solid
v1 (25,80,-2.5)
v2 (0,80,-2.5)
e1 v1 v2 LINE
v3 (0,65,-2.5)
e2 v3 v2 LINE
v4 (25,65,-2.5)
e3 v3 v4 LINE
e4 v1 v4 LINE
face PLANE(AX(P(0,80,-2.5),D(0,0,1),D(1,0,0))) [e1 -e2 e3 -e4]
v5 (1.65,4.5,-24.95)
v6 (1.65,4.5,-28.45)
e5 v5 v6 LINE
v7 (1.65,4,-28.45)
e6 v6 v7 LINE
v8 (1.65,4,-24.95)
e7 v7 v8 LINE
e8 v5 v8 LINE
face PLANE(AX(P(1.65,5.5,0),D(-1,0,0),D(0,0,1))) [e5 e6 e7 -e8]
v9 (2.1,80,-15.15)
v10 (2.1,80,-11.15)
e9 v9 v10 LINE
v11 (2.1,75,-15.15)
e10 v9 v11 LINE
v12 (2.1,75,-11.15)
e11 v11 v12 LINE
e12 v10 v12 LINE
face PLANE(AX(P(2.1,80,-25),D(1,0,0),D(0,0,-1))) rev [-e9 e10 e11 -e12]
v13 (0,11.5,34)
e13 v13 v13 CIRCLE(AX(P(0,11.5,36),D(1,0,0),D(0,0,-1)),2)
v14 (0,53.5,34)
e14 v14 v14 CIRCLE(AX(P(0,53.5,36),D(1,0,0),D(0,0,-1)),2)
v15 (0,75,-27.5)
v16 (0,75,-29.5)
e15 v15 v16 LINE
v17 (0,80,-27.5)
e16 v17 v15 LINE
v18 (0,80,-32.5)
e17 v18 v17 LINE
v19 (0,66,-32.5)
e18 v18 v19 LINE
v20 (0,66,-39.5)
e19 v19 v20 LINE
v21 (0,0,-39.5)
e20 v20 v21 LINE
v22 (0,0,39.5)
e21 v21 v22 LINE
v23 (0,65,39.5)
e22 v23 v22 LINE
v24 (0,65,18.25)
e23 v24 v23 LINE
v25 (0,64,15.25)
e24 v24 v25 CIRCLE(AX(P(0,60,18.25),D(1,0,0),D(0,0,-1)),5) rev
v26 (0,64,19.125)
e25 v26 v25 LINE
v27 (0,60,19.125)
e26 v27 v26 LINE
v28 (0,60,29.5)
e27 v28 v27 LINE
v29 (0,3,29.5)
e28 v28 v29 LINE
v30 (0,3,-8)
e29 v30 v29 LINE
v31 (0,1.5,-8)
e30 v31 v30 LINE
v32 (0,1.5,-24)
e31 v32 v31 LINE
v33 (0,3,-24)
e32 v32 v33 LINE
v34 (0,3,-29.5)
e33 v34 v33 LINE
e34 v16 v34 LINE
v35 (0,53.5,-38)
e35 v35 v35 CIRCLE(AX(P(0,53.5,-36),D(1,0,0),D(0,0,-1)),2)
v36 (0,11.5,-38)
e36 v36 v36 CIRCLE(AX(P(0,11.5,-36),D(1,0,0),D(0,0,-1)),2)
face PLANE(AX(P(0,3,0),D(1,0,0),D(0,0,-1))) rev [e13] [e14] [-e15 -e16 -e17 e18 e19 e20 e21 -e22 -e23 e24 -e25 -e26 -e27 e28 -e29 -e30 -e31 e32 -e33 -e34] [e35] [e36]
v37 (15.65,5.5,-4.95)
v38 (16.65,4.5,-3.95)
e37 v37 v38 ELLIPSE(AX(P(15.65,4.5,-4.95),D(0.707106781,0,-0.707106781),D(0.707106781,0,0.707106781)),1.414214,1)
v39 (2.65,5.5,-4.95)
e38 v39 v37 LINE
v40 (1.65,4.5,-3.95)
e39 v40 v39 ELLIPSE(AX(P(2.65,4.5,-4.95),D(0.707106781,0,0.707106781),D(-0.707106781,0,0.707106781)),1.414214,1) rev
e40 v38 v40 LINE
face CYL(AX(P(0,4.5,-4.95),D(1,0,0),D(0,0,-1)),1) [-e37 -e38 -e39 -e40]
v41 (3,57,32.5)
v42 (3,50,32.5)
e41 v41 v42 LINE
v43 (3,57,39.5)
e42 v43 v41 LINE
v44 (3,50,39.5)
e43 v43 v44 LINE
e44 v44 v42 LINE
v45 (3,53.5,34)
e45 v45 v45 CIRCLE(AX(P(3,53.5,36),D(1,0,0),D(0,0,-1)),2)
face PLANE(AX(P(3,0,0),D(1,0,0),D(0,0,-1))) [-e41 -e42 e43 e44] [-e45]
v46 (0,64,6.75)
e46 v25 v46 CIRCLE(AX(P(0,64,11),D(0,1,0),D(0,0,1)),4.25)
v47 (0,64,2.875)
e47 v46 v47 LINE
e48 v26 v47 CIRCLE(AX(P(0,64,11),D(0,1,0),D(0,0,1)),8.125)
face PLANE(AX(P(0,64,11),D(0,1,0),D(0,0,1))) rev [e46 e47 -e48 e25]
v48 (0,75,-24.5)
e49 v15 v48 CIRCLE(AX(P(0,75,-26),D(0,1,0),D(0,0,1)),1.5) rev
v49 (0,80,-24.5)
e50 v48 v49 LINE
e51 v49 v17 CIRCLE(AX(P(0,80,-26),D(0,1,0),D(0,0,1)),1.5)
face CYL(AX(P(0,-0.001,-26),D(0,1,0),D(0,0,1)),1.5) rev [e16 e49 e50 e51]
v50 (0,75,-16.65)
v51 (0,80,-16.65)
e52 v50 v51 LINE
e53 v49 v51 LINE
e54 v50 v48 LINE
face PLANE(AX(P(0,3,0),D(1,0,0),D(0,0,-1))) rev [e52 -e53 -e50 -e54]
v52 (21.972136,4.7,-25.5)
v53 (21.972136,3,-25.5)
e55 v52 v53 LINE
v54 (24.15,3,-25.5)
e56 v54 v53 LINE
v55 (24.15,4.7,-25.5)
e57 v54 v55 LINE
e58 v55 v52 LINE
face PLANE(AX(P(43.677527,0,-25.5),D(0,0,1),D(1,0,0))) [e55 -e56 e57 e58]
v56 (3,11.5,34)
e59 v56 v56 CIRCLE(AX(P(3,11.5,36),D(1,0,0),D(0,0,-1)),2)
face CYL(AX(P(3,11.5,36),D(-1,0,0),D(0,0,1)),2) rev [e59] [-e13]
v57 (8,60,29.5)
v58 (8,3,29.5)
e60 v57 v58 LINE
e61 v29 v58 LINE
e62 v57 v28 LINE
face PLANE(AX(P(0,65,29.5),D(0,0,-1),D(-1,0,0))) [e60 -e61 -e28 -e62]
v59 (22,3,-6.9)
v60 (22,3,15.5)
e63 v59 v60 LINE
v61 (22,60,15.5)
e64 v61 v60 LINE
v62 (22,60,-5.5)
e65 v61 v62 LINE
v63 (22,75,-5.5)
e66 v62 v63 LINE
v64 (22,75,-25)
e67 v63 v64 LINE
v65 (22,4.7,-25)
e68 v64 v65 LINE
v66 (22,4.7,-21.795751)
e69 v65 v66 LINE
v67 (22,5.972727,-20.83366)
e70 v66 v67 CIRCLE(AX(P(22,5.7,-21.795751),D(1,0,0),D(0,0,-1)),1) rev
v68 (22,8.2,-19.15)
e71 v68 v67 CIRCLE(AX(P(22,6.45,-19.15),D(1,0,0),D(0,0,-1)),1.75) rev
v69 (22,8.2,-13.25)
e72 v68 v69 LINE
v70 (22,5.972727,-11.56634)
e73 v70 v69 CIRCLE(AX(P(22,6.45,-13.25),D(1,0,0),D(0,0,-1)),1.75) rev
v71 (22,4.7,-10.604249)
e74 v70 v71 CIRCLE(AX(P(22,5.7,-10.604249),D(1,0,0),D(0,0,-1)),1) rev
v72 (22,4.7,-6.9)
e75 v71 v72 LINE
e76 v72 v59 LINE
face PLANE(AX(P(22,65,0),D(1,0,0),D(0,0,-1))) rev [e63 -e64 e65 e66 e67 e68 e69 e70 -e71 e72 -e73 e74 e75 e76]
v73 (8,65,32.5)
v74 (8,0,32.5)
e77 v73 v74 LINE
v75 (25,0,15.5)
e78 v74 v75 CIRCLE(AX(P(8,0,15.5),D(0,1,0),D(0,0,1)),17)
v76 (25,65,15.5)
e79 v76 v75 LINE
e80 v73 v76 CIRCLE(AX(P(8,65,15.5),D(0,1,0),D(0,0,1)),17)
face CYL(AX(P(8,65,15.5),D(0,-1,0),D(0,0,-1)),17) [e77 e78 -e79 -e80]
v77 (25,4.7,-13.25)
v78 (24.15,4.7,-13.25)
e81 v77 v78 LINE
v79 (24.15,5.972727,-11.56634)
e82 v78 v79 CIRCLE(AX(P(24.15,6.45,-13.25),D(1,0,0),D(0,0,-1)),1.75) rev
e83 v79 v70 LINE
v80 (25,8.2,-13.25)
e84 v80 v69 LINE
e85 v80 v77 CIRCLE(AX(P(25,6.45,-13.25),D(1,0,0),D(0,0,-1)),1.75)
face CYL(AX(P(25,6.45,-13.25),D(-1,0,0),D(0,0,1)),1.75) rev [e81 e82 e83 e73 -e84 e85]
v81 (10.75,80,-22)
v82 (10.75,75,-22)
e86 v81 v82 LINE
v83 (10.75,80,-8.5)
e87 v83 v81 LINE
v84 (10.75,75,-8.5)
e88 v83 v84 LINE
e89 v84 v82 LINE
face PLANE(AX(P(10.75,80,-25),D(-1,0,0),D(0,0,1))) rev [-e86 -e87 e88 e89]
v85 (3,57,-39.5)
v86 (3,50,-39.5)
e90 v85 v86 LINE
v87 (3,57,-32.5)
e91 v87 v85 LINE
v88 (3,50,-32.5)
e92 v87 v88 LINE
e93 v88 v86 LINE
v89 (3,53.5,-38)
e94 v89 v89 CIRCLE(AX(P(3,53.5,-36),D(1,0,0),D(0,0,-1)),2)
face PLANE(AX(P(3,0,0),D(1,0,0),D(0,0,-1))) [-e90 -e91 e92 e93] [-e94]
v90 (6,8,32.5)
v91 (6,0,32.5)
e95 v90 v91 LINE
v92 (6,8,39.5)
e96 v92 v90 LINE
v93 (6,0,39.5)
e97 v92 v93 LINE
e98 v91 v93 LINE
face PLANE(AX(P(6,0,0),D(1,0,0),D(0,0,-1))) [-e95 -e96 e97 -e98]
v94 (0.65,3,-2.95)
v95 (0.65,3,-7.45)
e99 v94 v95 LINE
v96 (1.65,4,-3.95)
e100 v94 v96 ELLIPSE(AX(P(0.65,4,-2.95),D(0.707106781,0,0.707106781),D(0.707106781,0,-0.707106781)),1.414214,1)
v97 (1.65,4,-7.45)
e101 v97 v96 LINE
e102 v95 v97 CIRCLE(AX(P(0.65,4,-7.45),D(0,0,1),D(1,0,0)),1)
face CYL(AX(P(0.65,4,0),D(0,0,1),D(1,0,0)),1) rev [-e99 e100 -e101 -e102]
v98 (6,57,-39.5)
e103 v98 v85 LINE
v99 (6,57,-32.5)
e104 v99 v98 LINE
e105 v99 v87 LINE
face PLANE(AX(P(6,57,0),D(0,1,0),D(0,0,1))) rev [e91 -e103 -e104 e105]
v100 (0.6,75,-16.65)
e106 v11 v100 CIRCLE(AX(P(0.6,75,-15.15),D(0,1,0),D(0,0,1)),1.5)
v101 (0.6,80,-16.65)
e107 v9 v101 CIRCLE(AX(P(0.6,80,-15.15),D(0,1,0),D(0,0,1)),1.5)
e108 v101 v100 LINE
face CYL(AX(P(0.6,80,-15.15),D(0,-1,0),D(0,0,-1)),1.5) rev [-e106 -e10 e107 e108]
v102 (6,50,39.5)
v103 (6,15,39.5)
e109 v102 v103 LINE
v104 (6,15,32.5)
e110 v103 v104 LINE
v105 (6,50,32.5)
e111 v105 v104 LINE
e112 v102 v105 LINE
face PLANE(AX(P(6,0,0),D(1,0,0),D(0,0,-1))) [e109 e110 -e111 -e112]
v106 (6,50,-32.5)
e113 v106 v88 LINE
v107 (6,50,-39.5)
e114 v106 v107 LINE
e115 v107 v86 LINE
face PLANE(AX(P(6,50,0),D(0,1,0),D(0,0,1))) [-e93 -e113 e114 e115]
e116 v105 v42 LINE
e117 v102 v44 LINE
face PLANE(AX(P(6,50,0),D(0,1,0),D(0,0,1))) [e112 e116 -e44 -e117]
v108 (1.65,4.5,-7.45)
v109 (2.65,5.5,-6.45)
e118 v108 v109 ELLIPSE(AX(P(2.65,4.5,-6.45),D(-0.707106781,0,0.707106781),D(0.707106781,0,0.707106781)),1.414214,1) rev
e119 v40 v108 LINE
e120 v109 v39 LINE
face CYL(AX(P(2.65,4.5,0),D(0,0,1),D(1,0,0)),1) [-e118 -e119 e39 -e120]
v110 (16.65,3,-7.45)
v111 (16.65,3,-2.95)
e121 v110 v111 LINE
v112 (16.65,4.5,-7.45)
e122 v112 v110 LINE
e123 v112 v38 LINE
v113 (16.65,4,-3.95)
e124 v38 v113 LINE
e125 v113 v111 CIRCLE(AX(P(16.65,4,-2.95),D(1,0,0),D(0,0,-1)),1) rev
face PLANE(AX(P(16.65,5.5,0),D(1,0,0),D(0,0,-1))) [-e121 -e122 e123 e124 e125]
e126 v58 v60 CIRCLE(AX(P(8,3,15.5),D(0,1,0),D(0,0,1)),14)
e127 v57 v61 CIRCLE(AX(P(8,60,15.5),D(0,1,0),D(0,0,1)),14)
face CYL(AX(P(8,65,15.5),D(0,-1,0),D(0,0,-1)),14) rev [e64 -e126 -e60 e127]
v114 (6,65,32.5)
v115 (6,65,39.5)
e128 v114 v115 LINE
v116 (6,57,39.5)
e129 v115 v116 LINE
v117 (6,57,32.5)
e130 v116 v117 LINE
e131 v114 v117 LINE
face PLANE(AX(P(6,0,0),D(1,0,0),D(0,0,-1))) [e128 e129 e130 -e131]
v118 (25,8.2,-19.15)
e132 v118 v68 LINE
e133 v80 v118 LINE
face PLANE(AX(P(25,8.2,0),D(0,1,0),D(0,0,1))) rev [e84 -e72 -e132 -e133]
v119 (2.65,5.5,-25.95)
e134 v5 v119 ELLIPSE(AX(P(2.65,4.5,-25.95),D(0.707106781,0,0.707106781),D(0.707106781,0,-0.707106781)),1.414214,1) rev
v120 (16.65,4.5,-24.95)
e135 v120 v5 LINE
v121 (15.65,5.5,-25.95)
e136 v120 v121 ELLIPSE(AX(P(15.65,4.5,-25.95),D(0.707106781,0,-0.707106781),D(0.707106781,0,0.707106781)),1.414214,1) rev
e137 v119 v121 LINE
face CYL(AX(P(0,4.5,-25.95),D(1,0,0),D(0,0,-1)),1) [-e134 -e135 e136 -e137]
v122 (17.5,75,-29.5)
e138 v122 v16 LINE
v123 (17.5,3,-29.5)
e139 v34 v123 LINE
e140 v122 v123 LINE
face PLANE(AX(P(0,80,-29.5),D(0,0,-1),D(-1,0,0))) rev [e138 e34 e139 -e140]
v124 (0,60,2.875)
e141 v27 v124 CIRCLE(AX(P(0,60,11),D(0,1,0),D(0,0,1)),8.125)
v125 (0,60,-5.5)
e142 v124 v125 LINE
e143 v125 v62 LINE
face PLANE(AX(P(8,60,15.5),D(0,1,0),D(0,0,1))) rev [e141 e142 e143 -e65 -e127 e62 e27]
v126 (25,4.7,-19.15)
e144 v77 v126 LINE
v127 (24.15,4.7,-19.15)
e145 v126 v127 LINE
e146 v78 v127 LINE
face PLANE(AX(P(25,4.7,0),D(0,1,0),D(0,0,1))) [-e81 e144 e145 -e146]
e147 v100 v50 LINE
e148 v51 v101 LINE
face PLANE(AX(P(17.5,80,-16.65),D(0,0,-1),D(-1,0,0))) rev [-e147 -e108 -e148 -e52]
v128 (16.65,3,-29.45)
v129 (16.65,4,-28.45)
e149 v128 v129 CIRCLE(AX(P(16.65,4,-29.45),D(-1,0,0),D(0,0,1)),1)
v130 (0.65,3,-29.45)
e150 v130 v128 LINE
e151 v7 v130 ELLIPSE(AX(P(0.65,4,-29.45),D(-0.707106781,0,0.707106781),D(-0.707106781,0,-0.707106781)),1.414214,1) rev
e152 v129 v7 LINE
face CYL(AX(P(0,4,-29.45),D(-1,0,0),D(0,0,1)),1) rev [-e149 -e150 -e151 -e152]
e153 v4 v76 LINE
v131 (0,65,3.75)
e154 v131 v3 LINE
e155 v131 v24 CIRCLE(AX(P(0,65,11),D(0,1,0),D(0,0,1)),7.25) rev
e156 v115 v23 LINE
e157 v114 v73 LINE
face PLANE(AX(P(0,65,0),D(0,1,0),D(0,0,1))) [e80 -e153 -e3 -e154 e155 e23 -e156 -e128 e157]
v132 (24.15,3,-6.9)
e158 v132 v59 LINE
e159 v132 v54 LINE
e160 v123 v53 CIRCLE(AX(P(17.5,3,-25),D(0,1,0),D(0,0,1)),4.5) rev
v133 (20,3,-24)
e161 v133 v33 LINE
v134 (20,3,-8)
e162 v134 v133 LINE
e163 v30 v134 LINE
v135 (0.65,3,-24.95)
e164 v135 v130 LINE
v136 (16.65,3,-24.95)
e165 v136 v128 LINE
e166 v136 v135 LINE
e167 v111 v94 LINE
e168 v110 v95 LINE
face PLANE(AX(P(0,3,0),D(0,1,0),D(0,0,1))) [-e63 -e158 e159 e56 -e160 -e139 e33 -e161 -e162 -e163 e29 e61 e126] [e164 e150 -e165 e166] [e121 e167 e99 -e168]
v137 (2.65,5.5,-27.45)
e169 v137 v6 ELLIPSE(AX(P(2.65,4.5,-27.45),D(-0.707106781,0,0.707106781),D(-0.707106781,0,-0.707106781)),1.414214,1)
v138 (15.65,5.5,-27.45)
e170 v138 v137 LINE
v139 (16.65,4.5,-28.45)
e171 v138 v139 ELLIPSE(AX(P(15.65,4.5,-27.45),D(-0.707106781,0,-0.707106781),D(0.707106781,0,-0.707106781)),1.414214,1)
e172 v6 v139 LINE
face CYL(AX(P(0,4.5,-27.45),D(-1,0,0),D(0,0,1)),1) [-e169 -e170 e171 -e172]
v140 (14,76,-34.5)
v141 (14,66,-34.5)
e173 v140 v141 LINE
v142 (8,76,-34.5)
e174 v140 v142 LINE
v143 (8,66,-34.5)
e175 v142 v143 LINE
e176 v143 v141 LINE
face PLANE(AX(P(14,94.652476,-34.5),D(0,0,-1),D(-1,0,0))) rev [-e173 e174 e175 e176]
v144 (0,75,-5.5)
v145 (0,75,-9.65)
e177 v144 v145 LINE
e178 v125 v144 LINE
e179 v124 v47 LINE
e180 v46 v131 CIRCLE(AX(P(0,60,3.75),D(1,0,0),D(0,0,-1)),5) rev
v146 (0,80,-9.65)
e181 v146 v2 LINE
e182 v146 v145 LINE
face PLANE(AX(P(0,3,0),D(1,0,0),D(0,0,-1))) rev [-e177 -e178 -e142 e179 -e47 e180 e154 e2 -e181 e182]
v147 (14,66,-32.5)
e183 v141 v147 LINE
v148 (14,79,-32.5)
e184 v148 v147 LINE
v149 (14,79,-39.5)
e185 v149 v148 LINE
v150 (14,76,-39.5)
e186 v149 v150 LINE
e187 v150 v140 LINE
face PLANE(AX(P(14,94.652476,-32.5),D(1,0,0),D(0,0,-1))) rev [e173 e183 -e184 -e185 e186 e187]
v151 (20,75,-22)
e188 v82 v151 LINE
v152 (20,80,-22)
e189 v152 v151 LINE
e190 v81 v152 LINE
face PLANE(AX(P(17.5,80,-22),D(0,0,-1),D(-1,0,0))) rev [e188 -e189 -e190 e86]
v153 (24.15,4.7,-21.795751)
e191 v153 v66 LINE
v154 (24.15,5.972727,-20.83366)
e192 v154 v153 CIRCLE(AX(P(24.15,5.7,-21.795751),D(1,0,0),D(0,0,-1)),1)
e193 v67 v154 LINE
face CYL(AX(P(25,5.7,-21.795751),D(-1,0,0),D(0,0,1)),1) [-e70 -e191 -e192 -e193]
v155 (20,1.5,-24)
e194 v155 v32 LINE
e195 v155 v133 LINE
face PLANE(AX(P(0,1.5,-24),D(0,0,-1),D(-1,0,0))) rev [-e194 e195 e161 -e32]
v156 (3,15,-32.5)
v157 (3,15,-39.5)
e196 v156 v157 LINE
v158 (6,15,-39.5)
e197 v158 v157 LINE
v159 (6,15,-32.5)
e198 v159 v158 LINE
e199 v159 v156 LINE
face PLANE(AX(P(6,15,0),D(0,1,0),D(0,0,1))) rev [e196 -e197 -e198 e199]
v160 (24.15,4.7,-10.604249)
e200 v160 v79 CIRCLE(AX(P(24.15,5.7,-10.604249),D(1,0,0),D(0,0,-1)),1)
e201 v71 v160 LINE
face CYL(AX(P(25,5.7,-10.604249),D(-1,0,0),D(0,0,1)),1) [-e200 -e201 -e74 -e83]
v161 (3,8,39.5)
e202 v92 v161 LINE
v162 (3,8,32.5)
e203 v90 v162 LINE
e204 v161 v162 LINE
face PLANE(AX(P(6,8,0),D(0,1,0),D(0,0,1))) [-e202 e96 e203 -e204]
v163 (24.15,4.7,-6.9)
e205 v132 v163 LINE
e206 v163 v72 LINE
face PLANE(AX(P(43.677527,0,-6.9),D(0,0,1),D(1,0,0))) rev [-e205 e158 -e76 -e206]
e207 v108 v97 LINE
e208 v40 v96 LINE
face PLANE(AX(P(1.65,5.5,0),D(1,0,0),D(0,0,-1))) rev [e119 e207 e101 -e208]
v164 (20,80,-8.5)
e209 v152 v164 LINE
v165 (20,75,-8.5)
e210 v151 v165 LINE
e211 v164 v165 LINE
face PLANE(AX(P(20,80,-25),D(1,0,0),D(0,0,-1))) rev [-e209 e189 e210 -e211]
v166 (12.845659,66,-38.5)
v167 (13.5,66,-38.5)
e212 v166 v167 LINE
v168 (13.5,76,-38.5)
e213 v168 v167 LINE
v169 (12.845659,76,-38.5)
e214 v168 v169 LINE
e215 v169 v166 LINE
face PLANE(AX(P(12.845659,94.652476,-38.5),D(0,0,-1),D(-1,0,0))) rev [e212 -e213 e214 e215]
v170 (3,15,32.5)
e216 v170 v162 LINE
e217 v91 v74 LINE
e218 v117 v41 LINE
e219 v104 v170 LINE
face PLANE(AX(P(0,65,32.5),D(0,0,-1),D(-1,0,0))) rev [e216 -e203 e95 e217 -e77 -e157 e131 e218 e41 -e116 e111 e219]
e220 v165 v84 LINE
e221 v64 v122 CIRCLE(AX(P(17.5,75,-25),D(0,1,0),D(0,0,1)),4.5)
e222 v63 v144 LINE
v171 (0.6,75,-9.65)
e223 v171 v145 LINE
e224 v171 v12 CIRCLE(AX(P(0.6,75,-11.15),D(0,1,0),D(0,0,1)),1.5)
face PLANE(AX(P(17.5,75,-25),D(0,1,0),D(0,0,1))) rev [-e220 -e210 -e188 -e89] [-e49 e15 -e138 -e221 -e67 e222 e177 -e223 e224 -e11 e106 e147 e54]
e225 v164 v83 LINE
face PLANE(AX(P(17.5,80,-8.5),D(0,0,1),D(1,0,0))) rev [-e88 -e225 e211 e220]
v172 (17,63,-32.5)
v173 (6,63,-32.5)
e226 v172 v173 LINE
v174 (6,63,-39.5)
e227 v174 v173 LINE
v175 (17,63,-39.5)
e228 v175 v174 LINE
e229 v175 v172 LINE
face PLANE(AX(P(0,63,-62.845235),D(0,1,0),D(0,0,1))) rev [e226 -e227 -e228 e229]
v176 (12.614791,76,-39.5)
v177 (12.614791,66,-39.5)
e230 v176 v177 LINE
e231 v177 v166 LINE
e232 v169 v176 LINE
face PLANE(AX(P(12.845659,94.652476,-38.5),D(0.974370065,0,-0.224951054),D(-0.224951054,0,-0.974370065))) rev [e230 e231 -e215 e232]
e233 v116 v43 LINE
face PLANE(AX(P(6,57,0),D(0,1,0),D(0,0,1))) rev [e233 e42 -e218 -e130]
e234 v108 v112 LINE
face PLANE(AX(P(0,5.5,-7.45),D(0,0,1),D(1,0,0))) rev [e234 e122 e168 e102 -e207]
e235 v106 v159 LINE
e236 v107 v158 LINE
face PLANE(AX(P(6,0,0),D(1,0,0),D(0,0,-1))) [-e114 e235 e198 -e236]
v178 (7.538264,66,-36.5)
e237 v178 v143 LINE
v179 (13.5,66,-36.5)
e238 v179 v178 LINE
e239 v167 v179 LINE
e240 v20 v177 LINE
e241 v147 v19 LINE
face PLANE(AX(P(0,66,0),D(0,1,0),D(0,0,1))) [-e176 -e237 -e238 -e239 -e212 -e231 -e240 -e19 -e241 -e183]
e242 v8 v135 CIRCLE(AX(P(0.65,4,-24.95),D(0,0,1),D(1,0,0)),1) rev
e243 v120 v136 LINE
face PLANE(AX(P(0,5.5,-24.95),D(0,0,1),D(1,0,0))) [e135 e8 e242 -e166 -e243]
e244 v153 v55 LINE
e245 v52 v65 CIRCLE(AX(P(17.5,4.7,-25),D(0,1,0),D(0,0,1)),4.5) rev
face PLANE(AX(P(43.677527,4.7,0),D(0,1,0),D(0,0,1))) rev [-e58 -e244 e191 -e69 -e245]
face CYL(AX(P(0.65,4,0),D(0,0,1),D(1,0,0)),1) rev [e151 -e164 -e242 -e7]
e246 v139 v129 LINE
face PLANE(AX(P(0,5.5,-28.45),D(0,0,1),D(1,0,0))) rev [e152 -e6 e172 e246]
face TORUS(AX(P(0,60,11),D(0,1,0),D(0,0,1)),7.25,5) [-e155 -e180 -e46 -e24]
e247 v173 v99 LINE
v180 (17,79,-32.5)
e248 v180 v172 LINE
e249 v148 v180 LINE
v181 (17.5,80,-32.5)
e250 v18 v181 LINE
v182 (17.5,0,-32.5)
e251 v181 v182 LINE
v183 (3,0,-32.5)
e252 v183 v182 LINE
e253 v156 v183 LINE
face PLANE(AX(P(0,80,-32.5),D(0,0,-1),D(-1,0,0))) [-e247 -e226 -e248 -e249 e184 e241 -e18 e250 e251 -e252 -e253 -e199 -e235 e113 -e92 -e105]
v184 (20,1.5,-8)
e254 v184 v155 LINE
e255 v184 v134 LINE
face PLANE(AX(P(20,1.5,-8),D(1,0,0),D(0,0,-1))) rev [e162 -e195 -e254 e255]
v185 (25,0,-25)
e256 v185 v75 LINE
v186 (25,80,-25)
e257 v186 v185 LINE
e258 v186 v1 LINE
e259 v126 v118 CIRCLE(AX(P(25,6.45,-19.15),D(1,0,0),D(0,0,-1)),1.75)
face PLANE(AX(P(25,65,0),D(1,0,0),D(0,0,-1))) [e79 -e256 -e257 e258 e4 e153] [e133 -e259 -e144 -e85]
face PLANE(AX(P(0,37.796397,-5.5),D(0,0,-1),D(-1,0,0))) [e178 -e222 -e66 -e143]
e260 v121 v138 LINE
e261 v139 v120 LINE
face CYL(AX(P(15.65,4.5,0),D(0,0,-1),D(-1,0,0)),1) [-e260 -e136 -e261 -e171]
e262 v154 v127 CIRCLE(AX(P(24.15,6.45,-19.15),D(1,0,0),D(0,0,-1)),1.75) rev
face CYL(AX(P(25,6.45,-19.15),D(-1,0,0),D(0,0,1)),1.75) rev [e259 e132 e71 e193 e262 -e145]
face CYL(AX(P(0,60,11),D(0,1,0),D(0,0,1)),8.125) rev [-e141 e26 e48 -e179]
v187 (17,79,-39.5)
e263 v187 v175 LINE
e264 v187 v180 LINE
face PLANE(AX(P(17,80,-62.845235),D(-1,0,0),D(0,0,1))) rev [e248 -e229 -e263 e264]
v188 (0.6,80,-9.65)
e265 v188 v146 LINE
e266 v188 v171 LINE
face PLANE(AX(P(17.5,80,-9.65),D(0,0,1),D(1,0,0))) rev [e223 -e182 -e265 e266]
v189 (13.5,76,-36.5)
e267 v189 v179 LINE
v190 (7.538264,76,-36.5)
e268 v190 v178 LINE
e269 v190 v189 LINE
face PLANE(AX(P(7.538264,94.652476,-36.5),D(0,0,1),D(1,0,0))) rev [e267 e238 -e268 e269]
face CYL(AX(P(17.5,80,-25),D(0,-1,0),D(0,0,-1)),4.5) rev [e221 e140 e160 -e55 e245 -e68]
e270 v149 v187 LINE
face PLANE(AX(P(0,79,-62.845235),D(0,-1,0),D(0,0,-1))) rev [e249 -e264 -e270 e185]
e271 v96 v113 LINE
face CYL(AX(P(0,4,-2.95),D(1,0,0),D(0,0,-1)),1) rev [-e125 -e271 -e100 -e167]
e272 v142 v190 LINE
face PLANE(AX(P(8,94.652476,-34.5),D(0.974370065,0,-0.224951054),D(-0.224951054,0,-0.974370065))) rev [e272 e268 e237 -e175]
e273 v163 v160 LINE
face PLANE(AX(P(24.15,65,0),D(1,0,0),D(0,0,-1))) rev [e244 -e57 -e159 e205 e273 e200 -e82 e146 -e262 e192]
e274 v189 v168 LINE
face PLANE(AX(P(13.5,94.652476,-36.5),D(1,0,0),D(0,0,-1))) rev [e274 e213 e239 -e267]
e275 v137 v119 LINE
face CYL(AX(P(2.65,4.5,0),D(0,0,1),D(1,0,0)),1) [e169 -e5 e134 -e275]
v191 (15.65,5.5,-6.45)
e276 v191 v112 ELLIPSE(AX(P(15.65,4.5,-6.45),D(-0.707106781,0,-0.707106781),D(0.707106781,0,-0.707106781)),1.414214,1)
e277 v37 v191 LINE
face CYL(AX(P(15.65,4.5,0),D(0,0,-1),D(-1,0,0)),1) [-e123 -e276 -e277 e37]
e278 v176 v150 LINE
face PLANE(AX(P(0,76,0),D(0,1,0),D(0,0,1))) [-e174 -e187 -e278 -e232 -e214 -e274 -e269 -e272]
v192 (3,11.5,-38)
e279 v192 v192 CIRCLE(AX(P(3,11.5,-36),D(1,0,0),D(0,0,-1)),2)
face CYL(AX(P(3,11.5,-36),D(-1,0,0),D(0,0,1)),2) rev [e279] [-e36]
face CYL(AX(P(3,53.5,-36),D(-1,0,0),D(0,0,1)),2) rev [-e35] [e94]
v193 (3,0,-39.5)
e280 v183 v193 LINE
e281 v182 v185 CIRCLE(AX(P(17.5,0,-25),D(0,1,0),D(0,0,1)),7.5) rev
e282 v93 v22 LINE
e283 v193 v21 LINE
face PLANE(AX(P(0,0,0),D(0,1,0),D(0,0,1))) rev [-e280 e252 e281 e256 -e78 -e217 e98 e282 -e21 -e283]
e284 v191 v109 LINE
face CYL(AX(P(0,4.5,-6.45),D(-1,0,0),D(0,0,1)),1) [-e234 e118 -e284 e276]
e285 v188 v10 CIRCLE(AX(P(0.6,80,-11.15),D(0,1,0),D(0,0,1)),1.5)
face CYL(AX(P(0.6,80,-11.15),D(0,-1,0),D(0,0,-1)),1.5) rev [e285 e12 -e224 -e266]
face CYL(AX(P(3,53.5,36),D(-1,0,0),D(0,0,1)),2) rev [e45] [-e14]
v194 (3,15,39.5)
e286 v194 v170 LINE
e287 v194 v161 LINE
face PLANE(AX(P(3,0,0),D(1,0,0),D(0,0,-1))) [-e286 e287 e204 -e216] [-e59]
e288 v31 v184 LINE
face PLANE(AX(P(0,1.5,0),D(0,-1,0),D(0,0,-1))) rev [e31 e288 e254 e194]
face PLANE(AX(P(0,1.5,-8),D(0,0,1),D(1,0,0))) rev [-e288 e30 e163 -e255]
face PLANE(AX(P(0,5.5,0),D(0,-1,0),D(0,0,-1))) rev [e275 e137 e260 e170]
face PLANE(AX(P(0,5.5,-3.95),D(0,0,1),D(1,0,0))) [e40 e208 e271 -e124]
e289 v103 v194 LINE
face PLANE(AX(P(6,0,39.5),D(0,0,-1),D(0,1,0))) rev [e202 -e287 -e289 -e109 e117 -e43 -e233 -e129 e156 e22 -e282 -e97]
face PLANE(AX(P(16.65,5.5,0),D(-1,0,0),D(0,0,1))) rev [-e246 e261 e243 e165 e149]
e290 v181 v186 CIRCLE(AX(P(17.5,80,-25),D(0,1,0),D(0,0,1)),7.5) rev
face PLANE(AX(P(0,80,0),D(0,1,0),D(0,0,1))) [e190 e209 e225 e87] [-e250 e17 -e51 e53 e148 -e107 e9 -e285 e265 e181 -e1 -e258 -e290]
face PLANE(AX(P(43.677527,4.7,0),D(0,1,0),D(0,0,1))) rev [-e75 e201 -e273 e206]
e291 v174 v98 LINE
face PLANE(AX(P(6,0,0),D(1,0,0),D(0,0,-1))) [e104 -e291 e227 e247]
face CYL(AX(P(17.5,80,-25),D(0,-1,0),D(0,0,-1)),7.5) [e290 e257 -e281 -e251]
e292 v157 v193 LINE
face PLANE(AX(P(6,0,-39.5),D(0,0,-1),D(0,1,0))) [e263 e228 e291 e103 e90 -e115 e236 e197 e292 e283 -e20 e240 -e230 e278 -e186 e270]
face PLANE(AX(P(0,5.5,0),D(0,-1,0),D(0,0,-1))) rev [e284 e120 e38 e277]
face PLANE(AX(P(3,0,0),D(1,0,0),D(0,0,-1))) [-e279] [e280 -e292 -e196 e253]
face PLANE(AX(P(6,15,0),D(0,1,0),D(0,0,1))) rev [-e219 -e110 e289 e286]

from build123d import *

# Parameters (mm, degrees)
FLOOR_2_DEPTH           = 3
WALLS_DEPTH             = 65
WALLS2_DEPTH            = 80
CEILING_START           = 60
CEILING_DEPTH           = 5
CEILING2_START          = 75
CEILING2_DEPTH          = 5
SALIENTE_EXTRUIR3_START = 80
SALIENTE_EXTRUIR3_DEPTH = 20
COVER_START             = 64
COVER_DEPTH             = 1
CROQUIS8_W              = 7
CROQUIS8_H              = 7.999999999999993
UNION_DEPTH             = 6
CROQUIS8_3_R            = 2.0000000000000036
CROQUIS8_3_R_2          = 2.0000000000000027
UNION_2_DEPTH           = 3
CONECTOR_START          = -32.5
CROQUIS9_W              = 17
CROQUIS9_H              = 15.999999999999993
CONECTOR_DEPTH          = 7
CONECTOR2_START         = -3
CONECTOR2_DEPTH         = 10
SWICHT_ESP_START        = 75
SWICHT_ESP_DEPTH        = 18.656624156074244
CORTAR_EXTRUIR2_DEPTH   = 93.65662415607424
CORTAR_EXTRUIR3_DEPTH   = 24.15
SALIENTE_EXTRUIR4_START = 3
SALIENTE_EXTRUIR4_DEPTH = 2.5
REDONDEO1_R             = 1
CROQUIS21_W             = 14.000000000000002
CROQUIS21_H             = 6.999999999999993
CORTAR_EXTRUIR5_DEPTH   = 90.22583706528059
REDONDEO2_R             = 5
CORTAR_EXTRUIR6_REACH   = 94.657
CROQUIS22_R             = 1.5000000000000018
REDONDEO3_R             = 1
CROQUIS18_W             = 20
CROQUIS18_H             = 16
CORTAR_EXTRUIR7_DEPTH   = 1.5


# Read off the part's stored shape, not the designer's step: Walls2
with BuildPart() as part:
    # Croquis3 → Floor 2 (new body)
    with BuildSketch(Plane(origin=(0, 0, 0), x_dir=(1, 0, 0), z_dir=(0, 1, 0))):
        with BuildLine():
            Line((17.5, 29.500000000000004), (0, 29.500000000000004))
            Line((0, 29.500000000000004), (7.41e-15, -29.500000000000004))
            Line((7.41e-15, -29.500000000000004), (8.000000000000002, -29.500000000000004))
            ThreePointArc((8.000000000000002, -29.500000000000007), (17.89949493661167, -25.399494936611667), (22.000000000000007, -15.499999999999998))
            Line((22.000000000000007, -15.5), (22.000000000000004, 25))
            ThreePointArc((22.000000000000004, 25), (20.681980515339465, 28.181980515339465), (17.5, 29.500000000000004))
        make_face()
    extrude(amount=FLOOR_2_DEPTH)

    # Croquis3<3> → Walls (add)
    with BuildSketch(Plane(origin=(0, 0, 0), x_dir=(1, 0, 0), z_dir=(0, 1, 0))):
        with BuildLine():
            Line((25.000000000000004, 5.5), (22.000000000000007, 5.5))
            Line((22.00000000000001, 5.5), (22.000000000000007, -15.5))
            ThreePointArc((22.000000000000007, -15.499999999999998), (17.89949493661167, -25.399494936611667), (8.000000000000002, -29.500000000000007))
            Line((8.000000000000002, -29.500000000000004), (7.41e-15, -29.500000000000004))
            Line((7.07e-15, -29.5), (7.41e-15, -32.5))
            Line((7.41e-15, -32.5), (8.000000000000005, -32.5))
            ThreePointArc((8.000000000000005, -32.5), (20.020815280171313, -27.520815280171306), (25, -15.499999999999998))
            Line((25, -15.499999999999998), (25.000000000000004, 5.500000000000002))
        make_face()
    extrude(amount=WALLS_DEPTH)

    # Walls2 outline → Walls2 (add)
    with BuildSketch(Plane(origin=(0, 0, 0), x_dir=(1, 0, 0), z_dir=(0, 1, 0))):
        with BuildLine():
            Line((0, 32.5), (0, 29.5))
            Line((0, 29.5), (17.5, 29.5))
            ThreePointArc((17.5, 29.5), (20.681980515, 28.181980515), (22, 25))
            Line((22, 25), (22, 2.5))
            Line((22, 2.5), (25, 2.5))
            Line((25, 2.5), (25, 25))
            ThreePointArc((25, 25), (22.803300859, 30.303300859), (17.5, 32.5))
            Line((17.5, 32.5), (0, 32.5))
        make_face()
    extrude(amount=WALLS2_DEPTH)

    # Croquis3<4> → Ceiling (add)
    with BuildSketch(Plane(origin=(0, 0, 0), x_dir=(1, 0, 0), z_dir=(0, 1, 0)).offset(CEILING_START)):
        with BuildLine():
            Line((22.000000000000007, 2.500000000000002), (3.55e-15, 2.4999999999999996))
            Line((3.42e-15, 2.5), (4.03e-15, -2.875000000000014))
            ThreePointArc((5.66e-15, -2.8750000000000107), (8.124999999999995, -11.00000000000001), (6.32e-15, -19.12500000000001))
            Line((5.89e-15, -19.125000000000014), (7.07e-15, -29.5))
            Line((7.41e-15, -29.500000000000004), (8.000000000000002, -29.500000000000004))
            ThreePointArc((8.000000000000002, -29.500000000000007), (17.89949493661167, -25.399494936611667), (22.000000000000007, -15.499999999999998))
            Line((22.000000000000007, -15.5), (22.000000000000007, 2.5000000000000036))
        make_face()
    extrude(amount=CEILING_DEPTH)

    # Croquis3<7> → Ceiling2 (add)
    with BuildSketch(Plane(origin=(0, 0, 0), x_dir=(1, 0, 0), z_dir=(0, 1, 0)).offset(CEILING2_START)):
        with BuildLine():
            Line((17.5, 29.500000000000004), (0, 29.500000000000004))
            Line((3.4e-16, 29.500000000000004), (3.08e-15, 5.5))
            Line((3.31e-15, 5.5), (22.000000000000007, 5.5))
            Line((22.000000000000004, 5.5), (22.000000000000004, 25))
            ThreePointArc((22.000000000000004, 25), (20.681980515339465, 28.181980515339465), (17.5, 29.500000000000004))
        make_face()
    extrude(amount=CEILING2_DEPTH)

    # Croquis3<8> → Saliente-Extruir3 (add)
    with BuildSketch(Plane(origin=(0, 0, 0), x_dir=(1, 0, 0), z_dir=(0, 1, 0)).offset(SALIENTE_EXTRUIR3_START)):
        Polygon((22.000000000000007, 5.5), (3.31e-15, 5.5), (3.42e-15, 2.5), (22.000000000000007, 2.500000000000002), align=None)
    extrude(amount=-SALIENTE_EXTRUIR3_DEPTH)

    # Croquis3<5> → Cover (add)
    with BuildSketch(Plane(origin=(0, 0, 0), x_dir=(1, 0, 0), z_dir=(0, 1, 0)).offset(COVER_START)):
        with BuildLine():
            ThreePointArc((6.32e-15, -19.12500000000001), (8.124999999999995, -11.00000000000001), (5.66e-15, -2.8750000000000107))
            Line((4.03e-15, -2.875000000000014), (4.48e-15, -6.750000000000014))
            ThreePointArc((5.44e-15, -6.750000000000012), (4.2499999999999964, -11.000000000000012), (5.85e-15, -15.250000000000012))
            Line((5.45e-15, -15.250000000000014), (5.89e-15, -19.125000000000014))
        make_face()
    extrude(amount=COVER_DEPTH)

    # Croquis8 → Union (add)
    with BuildSketch(Plane(origin=(0, 0, 0), x_dir=(0, 0, -1), z_dir=(1, 0, 0))):
        with Locations((-36, 61)):
            Rectangle(CROQUIS8_W, CROQUIS8_H)
        Polygon((-32.5, 15), (-32.5, 50), (-39.499999999999986, 50), (-39.49999999999999, 15), align=None)
        Polygon((-32.5, 0), (-32.5, 8), (-39.5, 8.000000000000002), (-39.49999999999999, 0), align=None)
        Polygon((39.5, 80), (32.5, 80), (32.5, 57.000000000000036), (39.49999999999999, 57.000000000000036), align=None)
        Polygon((39.49999999999999, 50.000000000000036), (32.500000000000014, 50.00000000000003), (32.5, 15), (39.49999999999999, 15), align=None)
    extrude(amount=UNION_DEPTH)

    # Croquis8<3> → Union_2 (add)
    # profile 1 of 4: a face of its own
    with BuildSketch(Plane(origin=(0, 0, 0), x_dir=(0, 0, -1), z_dir=(1, 0, 0))):
        Polygon((-32.5, 50), (-32.5, 57), (-39.49999999999998, 57), (-39.5, 50), align=None)
        with Locations((-35.99999999999999, 53.50000000000001)):
            Circle(CROQUIS8_3_R, mode=Mode.SUBTRACT)
    # profile 2 of 4: a face of its own
    with BuildSketch(Plane(origin=(0, 0, 0), x_dir=(0, 0, -1), z_dir=(1, 0, 0))):
        Polygon((-32.5, 8), (-32.5, 15), (-39.5, 15), (-39.49999999999999, 8), align=None)
        with Locations((-36.00000000000001, 11.5)):
            Circle(CROQUIS8_3_R_2, mode=Mode.SUBTRACT)
    # profile 3 of 4: a face of its own
    with BuildSketch(Plane(origin=(0, 0, 0), x_dir=(0, 0, -1), z_dir=(1, 0, 0))):
        Polygon((39.49999999999999, 15), (32.500000000000014, 15), (32.5, 0), (39.50000000000001, 0), align=None)
        with Locations((36.00000000000001, 11.5)):
            Circle(CROQUIS8_3_R_2, mode=Mode.SUBTRACT)
    # profile 4 of 4: a face of its own
    with BuildSketch(Plane(origin=(0, 0, 0), x_dir=(0, 0, -1), z_dir=(1, 0, 0))):
        Polygon((39.49999999999999, 57.000000000000036), (32.500000000000014, 57.000000000000036), (32.5, 50.00000000000003), (39.49999999999999, 50.000000000000036), align=None)
        with Locations((36.00000000000001, 53.500000000000036)):
            Circle(CROQUIS8_3_R, mode=Mode.SUBTRACT)
    extrude(amount=UNION_2_DEPTH)

    # Croquis9 → Conector (add)
    with BuildSketch(Plane.XY.offset(CONECTOR_START)):
        with Locations((8.5, 71)):
            Rectangle(CROQUIS9_W, CROQUIS9_H)
    extrude(amount=-CONECTOR_DEPTH)

    # Croquis12 → Conector2 (cut)
    with BuildSketch(Plane.XZ.offset(-63).offset(CONECTOR2_START)):
        Polygon((0, -32.50000000000001), (14, -32.50000000000001), (13.999999999999996, -34.50000000000001), (7.9999999999999964, -34.500000000000014), (7.538263617748875, -36.50000000000003), (13.499999999999998, -36.50000000000003), (13.499999999999998, -38.50000000000003), (12.845659041125556, -38.50000000000003), (12.61479085, -39.50000000000001), (0, -39.50000000000001), align=None)
    extrude(amount=-CONECTOR2_DEPTH, mode=Mode.SUBTRACT)

    # Croquis13 → Swicht-Esp (cut, through all)
    with BuildSketch(Plane(origin=(0, 0, 0), x_dir=(1, 0, 0), z_dir=(0, 1, 0)).offset(SWICHT_ESP_START)):
        with BuildLine():
            Line((-11.399999999999999, 9.650000000000002), (0.6000000000000015, 9.650000000000002))
            ThreePointArc((0.6000000000000015, 9.650000000000002), (1.6606601717798224, 10.089339828220183), (2.100000000000001, 11.150000000000004))
            Line((2.100000000000001, 11.150000000000004), (2.100000000000001, 15.150000000000004))
            ThreePointArc((2.100000000000001, 15.150000000000004), (1.6606601717798242, 16.210660171779825), (0.6000000000000015, 16.650000000000006))
            Line((0.6000000000000015, 16.650000000000006), (-11.399999999999999, 16.650000000000006))
            ThreePointArc((-11.399999999999999, 16.650000000000006), (-12.46066017177982, 16.210660171779825), (-12.899999999999999, 15.150000000000004))
            Line((-12.899999999999999, 15.150000000000004), (-12.899999999999999, 11.150000000000004))
            ThreePointArc((-12.899999999999999, 11.150000000000004), (-12.460660171779821, 10.089339828220181), (-11.399999999999999, 9.650000000000002))
        make_face()
        Polygon((20, 8.500000000000002), (10.75, 8.5), (10.75, 22.000000000000004), (20, 22.000000000000004), align=None)
    extrude(amount=SWICHT_ESP_DEPTH, mode=Mode.SUBTRACT)

    # Croquis19 → Cortar-Extruir2 (cut, through all)
    with BuildSketch(Plane(origin=(0, 0, 0), x_dir=(0, 0, -1), z_dir=(1, 0, 0))):
        with BuildLine():
            Line((13.250000000000005, 4.700000000000003), (19.150000000000006, 4.700000000000003))
            ThreePointArc((19.150000000000006, 4.700000000000003), (20.90000000000001, 6.450000000000006), (19.150000000000006, 8.20000000000001))
            Line((19.150000000000006, 8.20000000000001), (13.250000000000005, 8.20000000000001))
            ThreePointArc((13.250000000000005, 8.20000000000001), (11.500000000000002, 6.450000000000006), (13.250000000000005, 4.700000000000003))
        make_face()
    extrude(amount=CORTAR_EXTRUIR2_DEPTH, mode=Mode.SUBTRACT)

    # Croquis19<3> → Cortar-Extruir3 (cut)
    with BuildSketch(Plane(origin=(0, 0, 0), x_dir=(0, 0, -1), z_dir=(1, 0, 0))):
        Polygon((19.150000000000006, 4.700000000000003), (13.250000000000005, 4.700000000000003), (7.400000000000011, 4.700000000000003), (7.400000000000011, 3.0000000000000027), (25, 3.0000000000000027), (25, 4.700000000000003), align=None)
        Polygon((25, 3.0000000000000027), (25.500000000000004, 3.0000000000000053), (25.500000000000004, 4.700000000000003), (25, 4.700000000000003), align=None)
        Polygon((6.90000000000001, 3.0000000000000053), (6.90000000000001, 4.700000000000003), (7.400000000000011, 4.700000000000003), (7.400000000000011, 3.0000000000000027), align=None)
    extrude(amount=CORTAR_EXTRUIR3_DEPTH, mode=Mode.SUBTRACT)

    # Croquis20 → Saliente-Extruir4 (add)
    with BuildSketch(Plane(origin=(0, 0, 0), x_dir=(1, 0, 0), z_dir=(0, 1, 0)).offset(SALIENTE_EXTRUIR4_START)):
        Polygon((1.6500000000000026, 3.9500000000000064), (16.650000000000006, 3.950000000000008), (16.650000000000006, 7.450000000000009), (1.6500000000000026, 7.450000000000006), align=None)
        Polygon((1.6499999999999995, 28.450000000000003), (16.650000000000002, 28.450000000000003), (16.650000000000002, 24.950000000000003), (1.6500000000000004, 24.950000000000003), align=None)
    extrude(amount=SALIENTE_EXTRUIR4_DEPTH)

    # Redondeo1
    redondeo1_edges = [part.edges().sort_by_distance(p)[0] for p in [
        (1.6500000000000026, 3, -5.700000000000006),
        (9.150000000000004, 5.5, -3.9500000000000073),
        (16.650000000000006, 5.5, -5.700000000000008),
        (1.6500000000000026, 5.5, -5.700000000000006),
        (9.150000000000004, 5.5, -7.450000000000008),
        (9.150000000000004, 3, -3.9500000000000073),
        (9.150000000000002, 5.5, -24.950000000000003),
        (9.150000000000002, 3, -28.450000000000003),
        (1.65, 5.5, -26.700000000000003),
        (16.650000000000002, 5.5, -26.700000000000003),
        (9.150000000000002, 5.5, -28.450000000000003),
        (1.65, 3, -26.700000000000003),
    ]]
    fillet(redondeo1_edges, radius=REDONDEO1_R)

    # Croquis21 → Cortar-Extruir5 (cut, through all)
    with BuildSketch(Plane.XZ.offset(-76)):
        with Locations((7.000000000000001, -36)):
            Rectangle(CROQUIS21_W, CROQUIS21_H)
    extrude(amount=-CORTAR_EXTRUIR5_DEPTH, mode=Mode.SUBTRACT)

    # Redondeo2
    # the kernel refuses this fillet: 5 mm, written as the material it takes off along each edge
    with BuildSketch(Plane(origin=(-3.77e-15, 65, 11.000000000000012), x_dir=(-0.9999950652018581, 0, -0.0031415874858800956), z_dir=(-0.0031415874858800956, 0, 0.9999950652018581))) as redondeo2_piece_1:
        with BuildLine():
            CenterArc((7.250000000000317, 4.999999999999999), REDONDEO2_R, 233.13010235415305, 36.86989764584695)
            Line((4.250000000000113, 1.000000000000149), (4.190000000000109, 0.9200000000001578))
            ThreePointArc((4.190000000000109, 0.9200000000001578), (4.149999999999999, 0.5000000000000709), (4.150000000000007, 0))
            Line((4.150000000000007, 0), (4.250000000000007, -0.09999999999999429))
            Line((4.250000000000007, -0.09999999999999429), (7.250000000000317, -0.09999999999999429))
            Line((7.250000000000317, -0.09999999999999429), (7.250000000000317, 0))
        make_face()
    revolve(axis=Axis((-3.77e-15, 65, 11.000000000000012), (0, -1, 0)), revolution_arc=359.64, mode=Mode.SUBTRACT)

    # Croquis22 → Cortar-Extruir6 (cut, up to next)
    with BuildSketch(Plane(origin=(0, 80, 0), x_dir=(1, 0, 0), z_dir=(0, 1, 0)), mode=Mode.PRIVATE) as cortar_extruir6_sk1:
        with Locations((0, 26.00000000000001)):
            Circle(CROQUIS22_R)
    cortar_extruir6_tool1 = extrude(cortar_extruir6_sk1.sketch, amount=-CORTAR_EXTRUIR6_REACH, mode=Mode.PRIVATE) & part.part
    add(cortar_extruir6_tool1.solids().sort_by_distance((0, 80, -26))[0], mode=Mode.SUBTRACT)

    # Redondeo3
    redondeo3_edges = [part.edges().sort_by_distance(p)[0] for p in [
        (23.075000000000003, 4.700000000000003, -13.250000000000005),
        (23.075000000000006, 4.700000000000003, -19.150000000000006),
    ]]
    fillet(redondeo3_edges, radius=REDONDEO3_R)

    # Croquis18 → Cortar-Extruir7 (cut)
    with BuildSketch(Plane(origin=(0, 3, 0), x_dir=(1, 0, 0), z_dir=(0, 1, 0))):
        with Locations((10, 16)):
            Rectangle(CROQUIS18_W, CROQUIS18_H)
    extrude(amount=-CORTAR_EXTRUIR7_DEPTH, mode=Mode.SUBTRACT)


solid = part.part
